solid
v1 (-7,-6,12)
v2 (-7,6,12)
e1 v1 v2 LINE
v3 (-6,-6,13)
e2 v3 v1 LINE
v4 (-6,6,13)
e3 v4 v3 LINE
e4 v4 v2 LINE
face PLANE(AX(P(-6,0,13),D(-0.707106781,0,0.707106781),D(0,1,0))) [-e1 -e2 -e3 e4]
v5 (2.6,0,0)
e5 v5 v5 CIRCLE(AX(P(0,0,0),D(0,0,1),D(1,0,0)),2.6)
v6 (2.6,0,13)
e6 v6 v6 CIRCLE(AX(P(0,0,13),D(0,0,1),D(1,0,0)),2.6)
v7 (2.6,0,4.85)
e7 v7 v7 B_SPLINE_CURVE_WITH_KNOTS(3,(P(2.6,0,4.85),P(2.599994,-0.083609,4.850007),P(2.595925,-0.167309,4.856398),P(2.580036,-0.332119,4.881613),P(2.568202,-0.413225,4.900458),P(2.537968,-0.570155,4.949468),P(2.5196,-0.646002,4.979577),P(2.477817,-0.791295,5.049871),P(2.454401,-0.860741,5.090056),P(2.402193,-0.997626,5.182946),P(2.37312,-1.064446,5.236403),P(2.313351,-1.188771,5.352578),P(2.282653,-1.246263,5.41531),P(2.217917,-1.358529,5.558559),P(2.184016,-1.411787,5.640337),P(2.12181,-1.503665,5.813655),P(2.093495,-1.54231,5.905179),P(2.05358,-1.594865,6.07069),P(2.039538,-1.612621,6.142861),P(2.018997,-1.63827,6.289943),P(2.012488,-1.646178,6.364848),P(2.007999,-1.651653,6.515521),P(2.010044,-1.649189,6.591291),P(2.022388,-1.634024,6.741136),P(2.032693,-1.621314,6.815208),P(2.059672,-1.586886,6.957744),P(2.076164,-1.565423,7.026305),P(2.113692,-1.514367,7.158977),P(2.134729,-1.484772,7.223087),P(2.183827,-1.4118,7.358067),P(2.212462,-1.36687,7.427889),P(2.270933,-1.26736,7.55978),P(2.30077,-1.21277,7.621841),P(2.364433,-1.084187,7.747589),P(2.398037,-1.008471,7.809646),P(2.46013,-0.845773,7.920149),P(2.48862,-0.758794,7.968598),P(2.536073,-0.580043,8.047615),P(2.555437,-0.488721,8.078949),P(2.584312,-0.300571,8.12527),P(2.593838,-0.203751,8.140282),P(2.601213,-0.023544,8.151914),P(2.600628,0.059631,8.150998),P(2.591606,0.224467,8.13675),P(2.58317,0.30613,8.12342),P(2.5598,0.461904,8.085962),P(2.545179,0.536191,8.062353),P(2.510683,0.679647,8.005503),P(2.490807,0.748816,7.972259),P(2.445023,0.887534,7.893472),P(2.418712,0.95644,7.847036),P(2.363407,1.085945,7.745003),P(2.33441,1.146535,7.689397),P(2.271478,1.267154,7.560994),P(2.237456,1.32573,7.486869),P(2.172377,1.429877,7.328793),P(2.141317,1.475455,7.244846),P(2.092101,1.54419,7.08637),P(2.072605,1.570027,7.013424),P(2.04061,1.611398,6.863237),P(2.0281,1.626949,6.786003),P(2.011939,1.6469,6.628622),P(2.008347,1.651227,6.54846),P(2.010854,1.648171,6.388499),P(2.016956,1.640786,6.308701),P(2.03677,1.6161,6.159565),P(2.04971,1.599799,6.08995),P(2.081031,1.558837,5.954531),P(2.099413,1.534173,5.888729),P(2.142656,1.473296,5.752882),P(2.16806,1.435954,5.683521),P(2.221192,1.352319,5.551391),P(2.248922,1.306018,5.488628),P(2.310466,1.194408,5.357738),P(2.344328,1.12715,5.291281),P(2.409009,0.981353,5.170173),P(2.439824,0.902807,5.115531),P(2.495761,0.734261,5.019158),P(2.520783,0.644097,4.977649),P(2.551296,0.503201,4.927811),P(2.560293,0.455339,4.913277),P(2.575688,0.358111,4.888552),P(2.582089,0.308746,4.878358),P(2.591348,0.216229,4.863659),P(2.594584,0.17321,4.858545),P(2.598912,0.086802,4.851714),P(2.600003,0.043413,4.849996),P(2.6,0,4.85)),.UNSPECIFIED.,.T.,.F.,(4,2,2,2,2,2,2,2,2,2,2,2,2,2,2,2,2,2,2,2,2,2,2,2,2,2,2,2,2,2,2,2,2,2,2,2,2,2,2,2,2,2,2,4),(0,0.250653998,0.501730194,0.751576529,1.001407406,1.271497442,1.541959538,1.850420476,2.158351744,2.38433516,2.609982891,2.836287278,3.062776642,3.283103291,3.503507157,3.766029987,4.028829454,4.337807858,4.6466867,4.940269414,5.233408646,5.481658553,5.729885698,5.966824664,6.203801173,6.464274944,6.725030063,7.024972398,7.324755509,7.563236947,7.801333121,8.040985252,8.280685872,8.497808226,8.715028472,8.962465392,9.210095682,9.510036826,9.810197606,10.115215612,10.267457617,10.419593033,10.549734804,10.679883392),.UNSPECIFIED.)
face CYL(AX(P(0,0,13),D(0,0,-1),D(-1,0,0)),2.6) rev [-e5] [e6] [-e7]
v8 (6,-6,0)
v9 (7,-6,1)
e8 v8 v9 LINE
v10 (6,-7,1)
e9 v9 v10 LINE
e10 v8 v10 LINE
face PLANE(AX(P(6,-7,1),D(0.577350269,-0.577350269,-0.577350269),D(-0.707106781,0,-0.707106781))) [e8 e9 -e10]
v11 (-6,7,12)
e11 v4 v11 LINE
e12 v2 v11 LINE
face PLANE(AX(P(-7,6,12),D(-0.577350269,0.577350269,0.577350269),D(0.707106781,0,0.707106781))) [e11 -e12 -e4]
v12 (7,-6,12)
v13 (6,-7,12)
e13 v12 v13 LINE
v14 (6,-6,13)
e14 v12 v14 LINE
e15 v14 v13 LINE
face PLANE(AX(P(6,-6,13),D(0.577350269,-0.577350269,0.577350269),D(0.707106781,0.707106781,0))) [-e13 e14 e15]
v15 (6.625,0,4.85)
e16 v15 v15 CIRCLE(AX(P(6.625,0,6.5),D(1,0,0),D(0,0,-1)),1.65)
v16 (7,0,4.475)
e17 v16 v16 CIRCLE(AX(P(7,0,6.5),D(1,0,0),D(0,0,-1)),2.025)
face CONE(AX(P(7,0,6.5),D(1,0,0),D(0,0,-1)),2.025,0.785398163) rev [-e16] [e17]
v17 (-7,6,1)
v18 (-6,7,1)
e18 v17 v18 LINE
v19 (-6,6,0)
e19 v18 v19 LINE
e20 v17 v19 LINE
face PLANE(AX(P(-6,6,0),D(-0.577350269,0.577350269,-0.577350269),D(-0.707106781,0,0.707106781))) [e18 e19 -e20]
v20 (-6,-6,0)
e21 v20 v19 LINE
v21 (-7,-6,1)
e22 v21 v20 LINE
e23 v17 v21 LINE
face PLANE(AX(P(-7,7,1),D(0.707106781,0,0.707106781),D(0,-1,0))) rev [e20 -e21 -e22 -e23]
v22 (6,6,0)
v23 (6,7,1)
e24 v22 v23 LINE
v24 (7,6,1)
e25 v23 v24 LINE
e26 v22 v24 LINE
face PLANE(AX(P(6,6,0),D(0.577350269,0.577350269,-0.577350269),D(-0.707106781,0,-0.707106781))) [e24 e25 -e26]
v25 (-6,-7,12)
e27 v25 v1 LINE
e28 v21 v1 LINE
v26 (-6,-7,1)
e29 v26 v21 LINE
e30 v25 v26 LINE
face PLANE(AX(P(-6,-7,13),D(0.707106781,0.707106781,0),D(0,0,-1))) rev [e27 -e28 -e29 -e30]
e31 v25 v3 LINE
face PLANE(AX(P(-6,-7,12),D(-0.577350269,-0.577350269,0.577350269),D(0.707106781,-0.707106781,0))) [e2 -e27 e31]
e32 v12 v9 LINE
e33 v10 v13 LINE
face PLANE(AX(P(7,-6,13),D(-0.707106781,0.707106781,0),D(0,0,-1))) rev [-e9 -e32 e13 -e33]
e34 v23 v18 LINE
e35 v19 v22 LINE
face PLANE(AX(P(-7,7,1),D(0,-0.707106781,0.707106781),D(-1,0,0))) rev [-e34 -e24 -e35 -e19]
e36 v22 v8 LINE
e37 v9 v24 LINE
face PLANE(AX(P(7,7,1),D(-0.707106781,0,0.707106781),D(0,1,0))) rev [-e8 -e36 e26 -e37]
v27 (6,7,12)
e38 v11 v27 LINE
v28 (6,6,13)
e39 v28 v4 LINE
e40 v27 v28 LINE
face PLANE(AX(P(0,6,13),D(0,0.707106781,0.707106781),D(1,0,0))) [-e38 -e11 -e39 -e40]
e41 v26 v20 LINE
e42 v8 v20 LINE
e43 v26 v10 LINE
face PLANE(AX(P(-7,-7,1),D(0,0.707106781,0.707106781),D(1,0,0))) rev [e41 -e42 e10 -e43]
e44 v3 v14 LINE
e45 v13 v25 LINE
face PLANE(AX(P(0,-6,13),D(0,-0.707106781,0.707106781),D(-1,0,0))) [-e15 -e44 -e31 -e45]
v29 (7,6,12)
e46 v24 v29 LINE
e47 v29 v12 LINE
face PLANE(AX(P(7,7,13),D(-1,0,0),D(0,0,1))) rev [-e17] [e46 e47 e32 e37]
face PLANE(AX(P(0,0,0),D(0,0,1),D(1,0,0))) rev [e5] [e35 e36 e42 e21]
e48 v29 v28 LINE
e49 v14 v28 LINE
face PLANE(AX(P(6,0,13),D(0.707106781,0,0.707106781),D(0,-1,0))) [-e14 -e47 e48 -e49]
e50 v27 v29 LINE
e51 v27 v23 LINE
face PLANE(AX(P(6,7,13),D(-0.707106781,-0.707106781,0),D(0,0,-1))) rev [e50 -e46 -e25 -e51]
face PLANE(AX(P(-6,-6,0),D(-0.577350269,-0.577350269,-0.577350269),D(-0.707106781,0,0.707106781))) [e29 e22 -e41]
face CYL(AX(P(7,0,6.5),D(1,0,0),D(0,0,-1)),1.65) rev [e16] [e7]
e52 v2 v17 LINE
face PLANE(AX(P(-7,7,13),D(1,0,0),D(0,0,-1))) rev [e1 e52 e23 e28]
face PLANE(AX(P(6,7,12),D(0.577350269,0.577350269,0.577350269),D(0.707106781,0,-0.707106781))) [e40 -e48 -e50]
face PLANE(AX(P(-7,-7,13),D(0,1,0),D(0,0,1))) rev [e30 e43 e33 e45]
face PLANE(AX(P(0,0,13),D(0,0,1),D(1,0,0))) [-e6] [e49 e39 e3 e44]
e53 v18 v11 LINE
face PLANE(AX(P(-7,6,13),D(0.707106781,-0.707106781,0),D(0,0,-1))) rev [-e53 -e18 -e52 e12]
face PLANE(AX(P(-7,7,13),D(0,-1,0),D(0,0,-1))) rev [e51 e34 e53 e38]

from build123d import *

# Parameters (mm, degrees)
SKETCH1_W           = 14
SKETCH1_H           = 14
SKETCH1_R           = 2.6
BOSS_EXTRUDE1_DEPTH = 13
CHAMFER1_SIZE       = 1


# Read off the part's stored shape, not the designer's step: M4 Tapped Hole1
with BuildPart() as part:
    # Sketch1 → Boss-Extrude1 (new body)
    with BuildSketch(Plane.XY):
        Rectangle(SKETCH1_W, SKETCH1_H)
        with Locations(Location((0, 0, 0), (0, 0, 180))):
            Circle(SKETCH1_R, mode=Mode.SUBTRACT)
    extrude(amount=BOSS_EXTRUDE1_DEPTH)

    # Chamfer1
    chamfer1_edges = [part.edges().sort_by_distance(p)[0] for p in [
        (7, 0, 13),
        (0, 7, 13),
        (-7, 0, 13),
        (0, 7, 0),
        (7, 0, 0),
        (0, -7, 0),
        (-7, 0, 0),
        (0, -7, 13),
        (-7, 7, 6.5),
        (7, 7, 6.5),
        (7, -7, 6.5),
        (-7, -7, 6.5),
    ]]
    chamfer(chamfer1_edges, length=CHAMFER1_SIZE)

    # M4 Tapped Hole1 outline → M4 Tapped Hole1 (revolve, cut)
    with BuildSketch(Plane.YX.offset(-6.5)):
        Polygon((0, 2.009055278), (1.65, 2.009055278), (1.65, 6.625), (2.025, 7), (0, 7), align=None)
    revolve(axis=Axis((0, 0, 6.5), (1, 0, 0)), mode=Mode.SUBTRACT)


solid = part.part
